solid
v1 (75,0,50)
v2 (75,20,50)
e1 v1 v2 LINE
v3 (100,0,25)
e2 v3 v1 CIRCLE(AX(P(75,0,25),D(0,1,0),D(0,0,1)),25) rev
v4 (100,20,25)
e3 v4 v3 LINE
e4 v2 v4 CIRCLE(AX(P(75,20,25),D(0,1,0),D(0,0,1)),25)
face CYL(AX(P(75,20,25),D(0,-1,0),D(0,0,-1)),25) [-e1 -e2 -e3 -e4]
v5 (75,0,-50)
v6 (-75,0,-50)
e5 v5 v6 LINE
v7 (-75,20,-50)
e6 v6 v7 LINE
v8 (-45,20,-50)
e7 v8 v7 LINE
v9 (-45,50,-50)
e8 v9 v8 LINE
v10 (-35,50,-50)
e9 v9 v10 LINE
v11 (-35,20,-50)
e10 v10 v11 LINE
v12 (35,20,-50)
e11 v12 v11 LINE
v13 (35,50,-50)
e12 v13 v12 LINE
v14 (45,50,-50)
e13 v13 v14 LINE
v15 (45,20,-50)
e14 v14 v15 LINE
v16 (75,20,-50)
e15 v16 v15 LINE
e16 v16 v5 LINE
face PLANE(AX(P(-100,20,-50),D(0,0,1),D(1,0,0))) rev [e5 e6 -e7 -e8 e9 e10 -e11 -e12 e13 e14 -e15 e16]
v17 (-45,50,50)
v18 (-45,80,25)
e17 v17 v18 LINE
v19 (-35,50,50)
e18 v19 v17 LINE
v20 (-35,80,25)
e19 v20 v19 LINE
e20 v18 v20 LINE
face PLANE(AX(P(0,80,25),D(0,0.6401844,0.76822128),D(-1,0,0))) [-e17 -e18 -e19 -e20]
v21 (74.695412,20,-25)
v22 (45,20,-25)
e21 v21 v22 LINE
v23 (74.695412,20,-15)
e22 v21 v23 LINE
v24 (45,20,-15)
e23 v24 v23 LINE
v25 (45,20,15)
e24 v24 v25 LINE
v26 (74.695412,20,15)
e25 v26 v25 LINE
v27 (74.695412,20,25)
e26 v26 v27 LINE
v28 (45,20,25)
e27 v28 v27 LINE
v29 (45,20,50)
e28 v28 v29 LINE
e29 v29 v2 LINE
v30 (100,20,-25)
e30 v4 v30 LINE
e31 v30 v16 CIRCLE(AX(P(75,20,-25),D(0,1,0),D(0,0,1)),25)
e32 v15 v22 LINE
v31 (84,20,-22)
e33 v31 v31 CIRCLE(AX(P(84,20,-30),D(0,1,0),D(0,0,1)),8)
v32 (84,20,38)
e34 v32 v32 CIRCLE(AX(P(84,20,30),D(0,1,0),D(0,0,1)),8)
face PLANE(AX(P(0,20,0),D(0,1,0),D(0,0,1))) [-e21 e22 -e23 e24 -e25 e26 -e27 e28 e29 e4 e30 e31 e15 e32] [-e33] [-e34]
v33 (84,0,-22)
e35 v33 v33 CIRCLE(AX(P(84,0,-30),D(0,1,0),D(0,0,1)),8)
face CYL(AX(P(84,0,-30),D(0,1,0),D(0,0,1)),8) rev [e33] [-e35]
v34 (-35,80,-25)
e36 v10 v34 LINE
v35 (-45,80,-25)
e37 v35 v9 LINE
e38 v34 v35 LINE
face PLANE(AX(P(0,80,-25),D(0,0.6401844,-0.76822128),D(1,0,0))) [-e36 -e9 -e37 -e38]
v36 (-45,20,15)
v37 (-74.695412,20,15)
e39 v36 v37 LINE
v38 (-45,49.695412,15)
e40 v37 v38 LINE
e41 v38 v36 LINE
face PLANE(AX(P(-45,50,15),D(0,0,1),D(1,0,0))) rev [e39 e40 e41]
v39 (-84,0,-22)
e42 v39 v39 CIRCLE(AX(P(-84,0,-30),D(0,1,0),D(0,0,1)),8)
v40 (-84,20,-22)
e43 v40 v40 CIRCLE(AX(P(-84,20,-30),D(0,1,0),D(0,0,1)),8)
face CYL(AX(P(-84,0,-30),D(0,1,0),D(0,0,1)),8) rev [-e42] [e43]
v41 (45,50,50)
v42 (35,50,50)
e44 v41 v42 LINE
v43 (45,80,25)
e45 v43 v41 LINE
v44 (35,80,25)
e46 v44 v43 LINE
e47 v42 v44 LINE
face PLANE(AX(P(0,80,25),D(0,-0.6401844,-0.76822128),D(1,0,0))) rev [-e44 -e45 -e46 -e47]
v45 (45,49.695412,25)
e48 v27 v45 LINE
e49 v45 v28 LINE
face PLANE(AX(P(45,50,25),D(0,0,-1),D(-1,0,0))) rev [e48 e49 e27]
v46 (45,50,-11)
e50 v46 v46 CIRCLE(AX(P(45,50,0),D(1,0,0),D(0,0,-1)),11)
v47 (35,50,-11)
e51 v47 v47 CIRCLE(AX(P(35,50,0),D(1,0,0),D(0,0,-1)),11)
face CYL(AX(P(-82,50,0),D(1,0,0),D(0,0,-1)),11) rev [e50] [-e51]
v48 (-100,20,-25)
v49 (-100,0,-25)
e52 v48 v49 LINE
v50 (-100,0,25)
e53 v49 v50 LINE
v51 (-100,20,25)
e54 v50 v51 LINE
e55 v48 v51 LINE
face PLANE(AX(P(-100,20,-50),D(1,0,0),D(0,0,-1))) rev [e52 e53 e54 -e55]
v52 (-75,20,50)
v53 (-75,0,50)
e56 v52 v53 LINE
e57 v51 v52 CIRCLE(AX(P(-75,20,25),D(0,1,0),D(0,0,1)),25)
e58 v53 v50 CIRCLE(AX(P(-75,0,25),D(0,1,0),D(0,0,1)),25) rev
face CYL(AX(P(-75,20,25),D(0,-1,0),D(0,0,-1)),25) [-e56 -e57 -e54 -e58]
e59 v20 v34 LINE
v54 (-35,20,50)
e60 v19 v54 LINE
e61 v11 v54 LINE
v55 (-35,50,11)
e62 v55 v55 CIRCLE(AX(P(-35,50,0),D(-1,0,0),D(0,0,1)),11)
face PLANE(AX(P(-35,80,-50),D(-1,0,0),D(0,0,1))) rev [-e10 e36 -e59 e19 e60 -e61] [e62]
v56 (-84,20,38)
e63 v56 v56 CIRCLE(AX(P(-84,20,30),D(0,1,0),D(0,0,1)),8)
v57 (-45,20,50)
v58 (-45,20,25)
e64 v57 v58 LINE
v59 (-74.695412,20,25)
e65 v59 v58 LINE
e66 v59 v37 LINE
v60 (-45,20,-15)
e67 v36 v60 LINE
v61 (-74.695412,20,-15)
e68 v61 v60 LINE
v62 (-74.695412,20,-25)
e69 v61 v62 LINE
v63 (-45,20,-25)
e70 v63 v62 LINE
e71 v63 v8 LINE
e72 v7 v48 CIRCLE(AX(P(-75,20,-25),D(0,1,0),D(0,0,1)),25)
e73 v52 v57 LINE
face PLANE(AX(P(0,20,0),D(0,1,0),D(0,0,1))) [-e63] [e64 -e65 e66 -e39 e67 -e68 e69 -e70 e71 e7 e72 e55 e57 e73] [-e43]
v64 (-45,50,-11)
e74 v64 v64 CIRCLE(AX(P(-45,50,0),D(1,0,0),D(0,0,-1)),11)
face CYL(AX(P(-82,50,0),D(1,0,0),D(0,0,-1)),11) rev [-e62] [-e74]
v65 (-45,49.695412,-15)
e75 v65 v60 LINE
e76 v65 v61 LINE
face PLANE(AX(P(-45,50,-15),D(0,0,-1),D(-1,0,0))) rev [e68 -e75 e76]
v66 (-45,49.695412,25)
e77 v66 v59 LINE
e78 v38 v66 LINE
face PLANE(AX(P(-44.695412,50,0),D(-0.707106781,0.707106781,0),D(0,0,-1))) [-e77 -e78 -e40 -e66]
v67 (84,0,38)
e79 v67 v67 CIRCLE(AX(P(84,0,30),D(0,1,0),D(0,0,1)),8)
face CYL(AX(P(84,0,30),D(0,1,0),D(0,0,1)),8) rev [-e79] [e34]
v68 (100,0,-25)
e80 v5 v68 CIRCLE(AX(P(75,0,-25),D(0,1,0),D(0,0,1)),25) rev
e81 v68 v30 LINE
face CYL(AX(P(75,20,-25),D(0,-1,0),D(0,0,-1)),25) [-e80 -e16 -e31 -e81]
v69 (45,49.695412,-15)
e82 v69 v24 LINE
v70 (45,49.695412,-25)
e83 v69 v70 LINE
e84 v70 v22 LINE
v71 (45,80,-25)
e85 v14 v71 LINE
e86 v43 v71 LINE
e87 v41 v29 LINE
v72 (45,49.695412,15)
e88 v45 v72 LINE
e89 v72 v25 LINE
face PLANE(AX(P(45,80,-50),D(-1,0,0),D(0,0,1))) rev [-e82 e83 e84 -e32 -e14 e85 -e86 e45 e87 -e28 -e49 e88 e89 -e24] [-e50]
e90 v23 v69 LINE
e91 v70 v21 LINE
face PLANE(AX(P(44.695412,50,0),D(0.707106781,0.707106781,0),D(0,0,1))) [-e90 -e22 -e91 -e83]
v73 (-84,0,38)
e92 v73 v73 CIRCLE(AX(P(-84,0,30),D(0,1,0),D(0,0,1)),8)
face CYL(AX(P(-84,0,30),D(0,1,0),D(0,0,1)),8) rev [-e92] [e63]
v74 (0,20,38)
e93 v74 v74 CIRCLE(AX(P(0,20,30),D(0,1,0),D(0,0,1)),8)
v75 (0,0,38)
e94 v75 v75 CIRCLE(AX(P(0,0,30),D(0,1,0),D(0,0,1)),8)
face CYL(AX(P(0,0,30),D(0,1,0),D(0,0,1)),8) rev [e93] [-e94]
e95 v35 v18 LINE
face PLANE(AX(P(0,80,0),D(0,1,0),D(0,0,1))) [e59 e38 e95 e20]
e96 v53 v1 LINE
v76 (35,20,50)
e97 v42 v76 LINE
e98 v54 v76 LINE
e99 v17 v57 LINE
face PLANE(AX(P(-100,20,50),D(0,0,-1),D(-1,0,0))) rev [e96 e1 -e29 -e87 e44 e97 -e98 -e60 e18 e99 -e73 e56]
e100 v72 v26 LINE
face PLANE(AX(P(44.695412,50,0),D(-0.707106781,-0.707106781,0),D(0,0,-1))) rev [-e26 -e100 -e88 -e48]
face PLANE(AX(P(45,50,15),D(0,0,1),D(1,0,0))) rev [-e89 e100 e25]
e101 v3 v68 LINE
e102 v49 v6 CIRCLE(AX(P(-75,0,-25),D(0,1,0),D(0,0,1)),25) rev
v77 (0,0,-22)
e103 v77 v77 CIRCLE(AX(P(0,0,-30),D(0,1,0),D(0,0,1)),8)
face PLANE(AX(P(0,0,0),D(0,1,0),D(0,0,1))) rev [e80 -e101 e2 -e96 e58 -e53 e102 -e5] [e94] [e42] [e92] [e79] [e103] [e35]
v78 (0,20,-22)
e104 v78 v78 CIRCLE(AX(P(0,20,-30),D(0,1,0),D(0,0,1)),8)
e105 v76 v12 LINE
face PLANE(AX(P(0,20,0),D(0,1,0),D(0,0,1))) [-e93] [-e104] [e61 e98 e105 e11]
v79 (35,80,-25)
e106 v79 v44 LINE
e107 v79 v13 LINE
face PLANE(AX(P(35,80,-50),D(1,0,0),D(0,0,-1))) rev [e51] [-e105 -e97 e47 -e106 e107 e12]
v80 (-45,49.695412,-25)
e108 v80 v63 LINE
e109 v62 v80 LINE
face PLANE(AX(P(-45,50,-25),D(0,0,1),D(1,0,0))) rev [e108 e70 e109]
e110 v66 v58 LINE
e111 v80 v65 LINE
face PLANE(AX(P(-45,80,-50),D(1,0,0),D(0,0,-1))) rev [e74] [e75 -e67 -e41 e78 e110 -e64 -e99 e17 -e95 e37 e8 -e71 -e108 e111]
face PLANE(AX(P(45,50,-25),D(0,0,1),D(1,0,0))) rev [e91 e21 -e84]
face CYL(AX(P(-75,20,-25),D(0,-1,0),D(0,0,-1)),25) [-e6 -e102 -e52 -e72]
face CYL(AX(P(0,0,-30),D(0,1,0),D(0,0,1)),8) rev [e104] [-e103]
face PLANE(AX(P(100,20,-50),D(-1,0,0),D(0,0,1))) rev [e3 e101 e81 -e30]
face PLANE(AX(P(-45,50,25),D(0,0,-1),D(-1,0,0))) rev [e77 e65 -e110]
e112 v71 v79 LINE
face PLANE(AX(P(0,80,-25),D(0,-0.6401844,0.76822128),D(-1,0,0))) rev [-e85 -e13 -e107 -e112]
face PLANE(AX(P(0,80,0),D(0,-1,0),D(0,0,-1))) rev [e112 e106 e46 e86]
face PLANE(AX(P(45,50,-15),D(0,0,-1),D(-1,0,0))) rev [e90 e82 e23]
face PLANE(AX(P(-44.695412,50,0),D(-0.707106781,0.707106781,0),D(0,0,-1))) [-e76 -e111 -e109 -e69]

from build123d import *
from OCP.BRepFilletAPI import BRepFilletAPI_MakeChamfer

# Parameters (mm, degrees)
SKETCH2_W           = 200
SKETCH2_H           = 100
BOSS_EXTRUDE1_DEPTH = 20
FILLET1_R           = 25
SKETCH3_R           = 8
CUT_EXTRUDE2_DEPTH  = 20
SKETCH4_W           = 10
SKETCH4_H           = 100
BOSS_EXTRUDE3_DEPTH = 80
CHAMFER1_SIZE       = 30
CHAMFER1_SIZE2      = 25
SKETCH5_R           = 11
CUT_EXTRUDE3_DEPTH  = 127
SKETCH8_W           = 30.69541184
SKETCH8_H           = 10
BOSS_EXTRUDE4_DEPTH = 30
CHAMFER2_SIZE       = 31


with BuildPart() as part:
    # Sketch2 → Boss-Extrude1 (new body)
    with BuildSketch(Plane(origin=(0, 0, 0), x_dir=(1, 0, 0), z_dir=(0, 1, 0))):
        Rectangle(SKETCH2_W, SKETCH2_H)
    extrude(amount=BOSS_EXTRUDE1_DEPTH)

    # Fillet1
    fillet1_edges = [part.edges().sort_by_distance(p)[0] for p in [
        (100, 10, 50),
        (-100, 10, 50),
        (-100, 10, -50),
        (100, 10, -50),
    ]]
    fillet(fillet1_edges, radius=FILLET1_R)

    # Sketch3 → Cut-Extrude2 (cut)
    with BuildSketch(Plane(origin=(0, 20, 0), x_dir=(1, 0, 0), z_dir=(0, 1, 0))):
        with Locations(Location((-84, -30, 0), (0, 0, 270))):
            Circle(SKETCH3_R)
        with Locations(Location((84, -30, 0), (0, 0, 270))):
            Circle(SKETCH3_R)
        with Locations(Location((84, 30, 0), (0, 0, 270))):
            Circle(SKETCH3_R)
        with Locations(Location((-84, 30, 0), (0, 0, 270))):
            Circle(SKETCH3_R)
        with Locations(Location((0, -30, 0), (0, 0, 270))):
            Circle(SKETCH3_R)
        with Locations(Location((0, 30, 0), (0, 0, 270))):
            Circle(SKETCH3_R)
    extrude(amount=-CUT_EXTRUDE2_DEPTH, mode=Mode.SUBTRACT)

    # Sketch4 → Boss-Extrude3 (add)
    with BuildSketch(Plane(origin=(0, 0, 0), x_dir=(1, 0, 0), z_dir=(0, 1, 0))):
        with Locations((-40, 0)):
            Rectangle(SKETCH4_W, SKETCH4_H)
        with Locations((40, 0)):
            Rectangle(SKETCH4_W, SKETCH4_H)
    extrude(amount=BOSS_EXTRUDE3_DEPTH)

    # Chamfer1: one chamfer whose edges measure the first distance from different faces: ONE call of the kernel's chamfer builder (chamfer() names one face for all edges)
    chamfer1_edges_1 = [part.edges().sort_by_distance(p)[0] for p in [
        (40, 80, -50),
        (-40, 80, -50),
    ]]
    chamfer1_side_1 = [part.faces().sort_by_distance(p)[0] for p in [
        (-73.3, 10, -50),
    ]]
    chamfer1_edges_2 = [part.edges().sort_by_distance(p)[0] for p in [
        (40, 80, 50),
        (-40, 80, 50),
    ]]
    chamfer1_side_2 = [part.faces().sort_by_distance(p)[0] for p in [
        (0, 1.7, 50),
    ]]
    chamfer1 = BRepFilletAPI_MakeChamfer(part.part.solid().wrapped)
    for e in chamfer1_edges_1:
        chamfer1.Add(CHAMFER1_SIZE, CHAMFER1_SIZE2, e.wrapped, chamfer1_side_1[0].wrapped)  # the first distance lies on this face
    for e in chamfer1_edges_2:
        chamfer1.Add(CHAMFER1_SIZE, CHAMFER1_SIZE2, e.wrapped, chamfer1_side_2[0].wrapped)  # the first distance lies on this face
    add(Compound.cast(chamfer1.Shape()), mode=Mode.REPLACE)

    # Sketch5 → Cut-Extrude3 (cut)
    with BuildSketch(Plane(origin=(45, 0, 0), x_dir=(0, 0, -1), z_dir=(1, 0, 0))):
        with Locations((0, 50)):
            Circle(SKETCH5_R)
    extrude(amount=-CUT_EXTRUDE3_DEPTH, mode=Mode.SUBTRACT)

    # Sketch8 → Boss-Extrude4 (add)
    with BuildSketch(Plane(origin=(0, 20, 0), x_dir=(1, 0, 0), z_dir=(0, 1, 0))):
        with Locations((60.34770592, -20)):
            Rectangle(SKETCH8_W, SKETCH8_H)
        with Locations((60.34770592, 20)):
            Rectangle(SKETCH8_W, SKETCH8_H)
        with Locations((-60.34770592, -20)):
            Rectangle(SKETCH8_W, SKETCH8_H)
        with Locations((-60.34770592, 20)):
            Rectangle(SKETCH8_W, SKETCH8_H)
    extrude(amount=BOSS_EXTRUDE4_DEPTH)

    # Chamfer2
    # the kernel refuses this chamfer: 31 mm, written as the material it takes off along each edge
    with BuildSketch(Plane(origin=(-75.69541184, 50, 64.722172627), x_dir=(0.9996219169112968, 0.027495876610586407, 0), z_dir=(0, 0, -1))) as chamfer2_piece_1_section:
        Polygon((CHAMFER2_SIZE * 0.999621916911, CHAMFER2_SIZE * 0.0274958766106), (-CHAMFER2_SIZE * 0.0274958766106, CHAMFER2_SIZE * 0.999621916911), (0, 0), align=None)
    chamfer2_piece_1 = extrude(amount=169.444345254, mode=Mode.PRIVATE)
    chamfer2_piece_1 = split(chamfer2_piece_1, bisect_by=Plane(origin=(-45, 39.85641553, -20), z_dir=(-1, 0, 0)), keep=Keep.TOP, mode=Mode.PRIVATE)
    chamfer2_piece_1 = split(chamfer2_piece_1, bisect_by=Plane(origin=(-65.469394976, 20, -20), z_dir=(0, 1, 0)), keep=Keep.TOP, mode=Mode.PRIVATE)
    add(chamfer2_piece_1, mode=Mode.SUBTRACT)
    with BuildSketch(Plane(origin=(-75.69541184, 50, -64.722172627), x_dir=(0.9996219169112968, 0.027495876610586407, 0), z_dir=(0, 0, 1))) as chamfer2_piece_2_section:
        Polygon((CHAMFER2_SIZE * 0.999621916911, -CHAMFER2_SIZE * 0.0274958766106), (-CHAMFER2_SIZE * 0.0274958766106, -CHAMFER2_SIZE * 0.999621916911), (0, 0), align=None)
    chamfer2_piece_2 = extrude(amount=169.444345254, mode=Mode.PRIVATE)
    chamfer2_piece_2 = split(chamfer2_piece_2, bisect_by=Plane(origin=(-45, 39.85641553, 20), z_dir=(-1, 0, 0)), keep=Keep.TOP, mode=Mode.PRIVATE)
    chamfer2_piece_2 = split(chamfer2_piece_2, bisect_by=Plane(origin=(-65.469394976, 20, 20), z_dir=(0, 1, 0)), keep=Keep.TOP, mode=Mode.PRIVATE)
    add(chamfer2_piece_2, mode=Mode.SUBTRACT)
    with BuildSketch(Plane(origin=(75.69541184, 50, 64.722172627), x_dir=(0.02749587661058618, -0.9996219169112968, 0), z_dir=(0, 0, -1))) as chamfer2_piece_3_section:
        Polygon((CHAMFER2_SIZE * 0.999621916911, CHAMFER2_SIZE * 0.0274958766106), (-CHAMFER2_SIZE * 0.0274958766106, CHAMFER2_SIZE * 0.999621916911), (0, 0), align=None)
    chamfer2_piece_3 = extrude(amount=169.444345254, mode=Mode.PRIVATE)
    chamfer2_piece_3 = split(chamfer2_piece_3, bisect_by=Plane(origin=(65.469394976, 20, -20), z_dir=(0, 1, 0)), keep=Keep.TOP, mode=Mode.PRIVATE)
    chamfer2_piece_3 = split(chamfer2_piece_3, bisect_by=Plane(origin=(45, 39.85641553, -20), z_dir=(1, 0, 0)), keep=Keep.TOP, mode=Mode.PRIVATE)
    add(chamfer2_piece_3, mode=Mode.SUBTRACT)
    with BuildSketch(Plane(origin=(75.69541184, 50, 104.722172627), x_dir=(0.02749587661058618, -0.9996219169112968, 0), z_dir=(0, 0, -1))) as chamfer2_piece_4_section:
        Polygon((CHAMFER2_SIZE * 0.999621916911, CHAMFER2_SIZE * 0.0274958766106), (-CHAMFER2_SIZE * 0.0274958766106, CHAMFER2_SIZE * 0.999621916911), (0, 0), align=None)
    chamfer2_piece_4 = extrude(amount=169.444345254, mode=Mode.PRIVATE)
    chamfer2_piece_4 = split(chamfer2_piece_4, bisect_by=Plane(origin=(65.469394976, 20, 20), z_dir=(0, 1, 0)), keep=Keep.TOP, mode=Mode.PRIVATE)
    chamfer2_piece_4 = split(chamfer2_piece_4, bisect_by=Plane(origin=(45, 39.85641553, 20), z_dir=(1, 0, 0)), keep=Keep.TOP, mode=Mode.PRIVATE)
    add(chamfer2_piece_4, mode=Mode.SUBTRACT)


solid = part.part
